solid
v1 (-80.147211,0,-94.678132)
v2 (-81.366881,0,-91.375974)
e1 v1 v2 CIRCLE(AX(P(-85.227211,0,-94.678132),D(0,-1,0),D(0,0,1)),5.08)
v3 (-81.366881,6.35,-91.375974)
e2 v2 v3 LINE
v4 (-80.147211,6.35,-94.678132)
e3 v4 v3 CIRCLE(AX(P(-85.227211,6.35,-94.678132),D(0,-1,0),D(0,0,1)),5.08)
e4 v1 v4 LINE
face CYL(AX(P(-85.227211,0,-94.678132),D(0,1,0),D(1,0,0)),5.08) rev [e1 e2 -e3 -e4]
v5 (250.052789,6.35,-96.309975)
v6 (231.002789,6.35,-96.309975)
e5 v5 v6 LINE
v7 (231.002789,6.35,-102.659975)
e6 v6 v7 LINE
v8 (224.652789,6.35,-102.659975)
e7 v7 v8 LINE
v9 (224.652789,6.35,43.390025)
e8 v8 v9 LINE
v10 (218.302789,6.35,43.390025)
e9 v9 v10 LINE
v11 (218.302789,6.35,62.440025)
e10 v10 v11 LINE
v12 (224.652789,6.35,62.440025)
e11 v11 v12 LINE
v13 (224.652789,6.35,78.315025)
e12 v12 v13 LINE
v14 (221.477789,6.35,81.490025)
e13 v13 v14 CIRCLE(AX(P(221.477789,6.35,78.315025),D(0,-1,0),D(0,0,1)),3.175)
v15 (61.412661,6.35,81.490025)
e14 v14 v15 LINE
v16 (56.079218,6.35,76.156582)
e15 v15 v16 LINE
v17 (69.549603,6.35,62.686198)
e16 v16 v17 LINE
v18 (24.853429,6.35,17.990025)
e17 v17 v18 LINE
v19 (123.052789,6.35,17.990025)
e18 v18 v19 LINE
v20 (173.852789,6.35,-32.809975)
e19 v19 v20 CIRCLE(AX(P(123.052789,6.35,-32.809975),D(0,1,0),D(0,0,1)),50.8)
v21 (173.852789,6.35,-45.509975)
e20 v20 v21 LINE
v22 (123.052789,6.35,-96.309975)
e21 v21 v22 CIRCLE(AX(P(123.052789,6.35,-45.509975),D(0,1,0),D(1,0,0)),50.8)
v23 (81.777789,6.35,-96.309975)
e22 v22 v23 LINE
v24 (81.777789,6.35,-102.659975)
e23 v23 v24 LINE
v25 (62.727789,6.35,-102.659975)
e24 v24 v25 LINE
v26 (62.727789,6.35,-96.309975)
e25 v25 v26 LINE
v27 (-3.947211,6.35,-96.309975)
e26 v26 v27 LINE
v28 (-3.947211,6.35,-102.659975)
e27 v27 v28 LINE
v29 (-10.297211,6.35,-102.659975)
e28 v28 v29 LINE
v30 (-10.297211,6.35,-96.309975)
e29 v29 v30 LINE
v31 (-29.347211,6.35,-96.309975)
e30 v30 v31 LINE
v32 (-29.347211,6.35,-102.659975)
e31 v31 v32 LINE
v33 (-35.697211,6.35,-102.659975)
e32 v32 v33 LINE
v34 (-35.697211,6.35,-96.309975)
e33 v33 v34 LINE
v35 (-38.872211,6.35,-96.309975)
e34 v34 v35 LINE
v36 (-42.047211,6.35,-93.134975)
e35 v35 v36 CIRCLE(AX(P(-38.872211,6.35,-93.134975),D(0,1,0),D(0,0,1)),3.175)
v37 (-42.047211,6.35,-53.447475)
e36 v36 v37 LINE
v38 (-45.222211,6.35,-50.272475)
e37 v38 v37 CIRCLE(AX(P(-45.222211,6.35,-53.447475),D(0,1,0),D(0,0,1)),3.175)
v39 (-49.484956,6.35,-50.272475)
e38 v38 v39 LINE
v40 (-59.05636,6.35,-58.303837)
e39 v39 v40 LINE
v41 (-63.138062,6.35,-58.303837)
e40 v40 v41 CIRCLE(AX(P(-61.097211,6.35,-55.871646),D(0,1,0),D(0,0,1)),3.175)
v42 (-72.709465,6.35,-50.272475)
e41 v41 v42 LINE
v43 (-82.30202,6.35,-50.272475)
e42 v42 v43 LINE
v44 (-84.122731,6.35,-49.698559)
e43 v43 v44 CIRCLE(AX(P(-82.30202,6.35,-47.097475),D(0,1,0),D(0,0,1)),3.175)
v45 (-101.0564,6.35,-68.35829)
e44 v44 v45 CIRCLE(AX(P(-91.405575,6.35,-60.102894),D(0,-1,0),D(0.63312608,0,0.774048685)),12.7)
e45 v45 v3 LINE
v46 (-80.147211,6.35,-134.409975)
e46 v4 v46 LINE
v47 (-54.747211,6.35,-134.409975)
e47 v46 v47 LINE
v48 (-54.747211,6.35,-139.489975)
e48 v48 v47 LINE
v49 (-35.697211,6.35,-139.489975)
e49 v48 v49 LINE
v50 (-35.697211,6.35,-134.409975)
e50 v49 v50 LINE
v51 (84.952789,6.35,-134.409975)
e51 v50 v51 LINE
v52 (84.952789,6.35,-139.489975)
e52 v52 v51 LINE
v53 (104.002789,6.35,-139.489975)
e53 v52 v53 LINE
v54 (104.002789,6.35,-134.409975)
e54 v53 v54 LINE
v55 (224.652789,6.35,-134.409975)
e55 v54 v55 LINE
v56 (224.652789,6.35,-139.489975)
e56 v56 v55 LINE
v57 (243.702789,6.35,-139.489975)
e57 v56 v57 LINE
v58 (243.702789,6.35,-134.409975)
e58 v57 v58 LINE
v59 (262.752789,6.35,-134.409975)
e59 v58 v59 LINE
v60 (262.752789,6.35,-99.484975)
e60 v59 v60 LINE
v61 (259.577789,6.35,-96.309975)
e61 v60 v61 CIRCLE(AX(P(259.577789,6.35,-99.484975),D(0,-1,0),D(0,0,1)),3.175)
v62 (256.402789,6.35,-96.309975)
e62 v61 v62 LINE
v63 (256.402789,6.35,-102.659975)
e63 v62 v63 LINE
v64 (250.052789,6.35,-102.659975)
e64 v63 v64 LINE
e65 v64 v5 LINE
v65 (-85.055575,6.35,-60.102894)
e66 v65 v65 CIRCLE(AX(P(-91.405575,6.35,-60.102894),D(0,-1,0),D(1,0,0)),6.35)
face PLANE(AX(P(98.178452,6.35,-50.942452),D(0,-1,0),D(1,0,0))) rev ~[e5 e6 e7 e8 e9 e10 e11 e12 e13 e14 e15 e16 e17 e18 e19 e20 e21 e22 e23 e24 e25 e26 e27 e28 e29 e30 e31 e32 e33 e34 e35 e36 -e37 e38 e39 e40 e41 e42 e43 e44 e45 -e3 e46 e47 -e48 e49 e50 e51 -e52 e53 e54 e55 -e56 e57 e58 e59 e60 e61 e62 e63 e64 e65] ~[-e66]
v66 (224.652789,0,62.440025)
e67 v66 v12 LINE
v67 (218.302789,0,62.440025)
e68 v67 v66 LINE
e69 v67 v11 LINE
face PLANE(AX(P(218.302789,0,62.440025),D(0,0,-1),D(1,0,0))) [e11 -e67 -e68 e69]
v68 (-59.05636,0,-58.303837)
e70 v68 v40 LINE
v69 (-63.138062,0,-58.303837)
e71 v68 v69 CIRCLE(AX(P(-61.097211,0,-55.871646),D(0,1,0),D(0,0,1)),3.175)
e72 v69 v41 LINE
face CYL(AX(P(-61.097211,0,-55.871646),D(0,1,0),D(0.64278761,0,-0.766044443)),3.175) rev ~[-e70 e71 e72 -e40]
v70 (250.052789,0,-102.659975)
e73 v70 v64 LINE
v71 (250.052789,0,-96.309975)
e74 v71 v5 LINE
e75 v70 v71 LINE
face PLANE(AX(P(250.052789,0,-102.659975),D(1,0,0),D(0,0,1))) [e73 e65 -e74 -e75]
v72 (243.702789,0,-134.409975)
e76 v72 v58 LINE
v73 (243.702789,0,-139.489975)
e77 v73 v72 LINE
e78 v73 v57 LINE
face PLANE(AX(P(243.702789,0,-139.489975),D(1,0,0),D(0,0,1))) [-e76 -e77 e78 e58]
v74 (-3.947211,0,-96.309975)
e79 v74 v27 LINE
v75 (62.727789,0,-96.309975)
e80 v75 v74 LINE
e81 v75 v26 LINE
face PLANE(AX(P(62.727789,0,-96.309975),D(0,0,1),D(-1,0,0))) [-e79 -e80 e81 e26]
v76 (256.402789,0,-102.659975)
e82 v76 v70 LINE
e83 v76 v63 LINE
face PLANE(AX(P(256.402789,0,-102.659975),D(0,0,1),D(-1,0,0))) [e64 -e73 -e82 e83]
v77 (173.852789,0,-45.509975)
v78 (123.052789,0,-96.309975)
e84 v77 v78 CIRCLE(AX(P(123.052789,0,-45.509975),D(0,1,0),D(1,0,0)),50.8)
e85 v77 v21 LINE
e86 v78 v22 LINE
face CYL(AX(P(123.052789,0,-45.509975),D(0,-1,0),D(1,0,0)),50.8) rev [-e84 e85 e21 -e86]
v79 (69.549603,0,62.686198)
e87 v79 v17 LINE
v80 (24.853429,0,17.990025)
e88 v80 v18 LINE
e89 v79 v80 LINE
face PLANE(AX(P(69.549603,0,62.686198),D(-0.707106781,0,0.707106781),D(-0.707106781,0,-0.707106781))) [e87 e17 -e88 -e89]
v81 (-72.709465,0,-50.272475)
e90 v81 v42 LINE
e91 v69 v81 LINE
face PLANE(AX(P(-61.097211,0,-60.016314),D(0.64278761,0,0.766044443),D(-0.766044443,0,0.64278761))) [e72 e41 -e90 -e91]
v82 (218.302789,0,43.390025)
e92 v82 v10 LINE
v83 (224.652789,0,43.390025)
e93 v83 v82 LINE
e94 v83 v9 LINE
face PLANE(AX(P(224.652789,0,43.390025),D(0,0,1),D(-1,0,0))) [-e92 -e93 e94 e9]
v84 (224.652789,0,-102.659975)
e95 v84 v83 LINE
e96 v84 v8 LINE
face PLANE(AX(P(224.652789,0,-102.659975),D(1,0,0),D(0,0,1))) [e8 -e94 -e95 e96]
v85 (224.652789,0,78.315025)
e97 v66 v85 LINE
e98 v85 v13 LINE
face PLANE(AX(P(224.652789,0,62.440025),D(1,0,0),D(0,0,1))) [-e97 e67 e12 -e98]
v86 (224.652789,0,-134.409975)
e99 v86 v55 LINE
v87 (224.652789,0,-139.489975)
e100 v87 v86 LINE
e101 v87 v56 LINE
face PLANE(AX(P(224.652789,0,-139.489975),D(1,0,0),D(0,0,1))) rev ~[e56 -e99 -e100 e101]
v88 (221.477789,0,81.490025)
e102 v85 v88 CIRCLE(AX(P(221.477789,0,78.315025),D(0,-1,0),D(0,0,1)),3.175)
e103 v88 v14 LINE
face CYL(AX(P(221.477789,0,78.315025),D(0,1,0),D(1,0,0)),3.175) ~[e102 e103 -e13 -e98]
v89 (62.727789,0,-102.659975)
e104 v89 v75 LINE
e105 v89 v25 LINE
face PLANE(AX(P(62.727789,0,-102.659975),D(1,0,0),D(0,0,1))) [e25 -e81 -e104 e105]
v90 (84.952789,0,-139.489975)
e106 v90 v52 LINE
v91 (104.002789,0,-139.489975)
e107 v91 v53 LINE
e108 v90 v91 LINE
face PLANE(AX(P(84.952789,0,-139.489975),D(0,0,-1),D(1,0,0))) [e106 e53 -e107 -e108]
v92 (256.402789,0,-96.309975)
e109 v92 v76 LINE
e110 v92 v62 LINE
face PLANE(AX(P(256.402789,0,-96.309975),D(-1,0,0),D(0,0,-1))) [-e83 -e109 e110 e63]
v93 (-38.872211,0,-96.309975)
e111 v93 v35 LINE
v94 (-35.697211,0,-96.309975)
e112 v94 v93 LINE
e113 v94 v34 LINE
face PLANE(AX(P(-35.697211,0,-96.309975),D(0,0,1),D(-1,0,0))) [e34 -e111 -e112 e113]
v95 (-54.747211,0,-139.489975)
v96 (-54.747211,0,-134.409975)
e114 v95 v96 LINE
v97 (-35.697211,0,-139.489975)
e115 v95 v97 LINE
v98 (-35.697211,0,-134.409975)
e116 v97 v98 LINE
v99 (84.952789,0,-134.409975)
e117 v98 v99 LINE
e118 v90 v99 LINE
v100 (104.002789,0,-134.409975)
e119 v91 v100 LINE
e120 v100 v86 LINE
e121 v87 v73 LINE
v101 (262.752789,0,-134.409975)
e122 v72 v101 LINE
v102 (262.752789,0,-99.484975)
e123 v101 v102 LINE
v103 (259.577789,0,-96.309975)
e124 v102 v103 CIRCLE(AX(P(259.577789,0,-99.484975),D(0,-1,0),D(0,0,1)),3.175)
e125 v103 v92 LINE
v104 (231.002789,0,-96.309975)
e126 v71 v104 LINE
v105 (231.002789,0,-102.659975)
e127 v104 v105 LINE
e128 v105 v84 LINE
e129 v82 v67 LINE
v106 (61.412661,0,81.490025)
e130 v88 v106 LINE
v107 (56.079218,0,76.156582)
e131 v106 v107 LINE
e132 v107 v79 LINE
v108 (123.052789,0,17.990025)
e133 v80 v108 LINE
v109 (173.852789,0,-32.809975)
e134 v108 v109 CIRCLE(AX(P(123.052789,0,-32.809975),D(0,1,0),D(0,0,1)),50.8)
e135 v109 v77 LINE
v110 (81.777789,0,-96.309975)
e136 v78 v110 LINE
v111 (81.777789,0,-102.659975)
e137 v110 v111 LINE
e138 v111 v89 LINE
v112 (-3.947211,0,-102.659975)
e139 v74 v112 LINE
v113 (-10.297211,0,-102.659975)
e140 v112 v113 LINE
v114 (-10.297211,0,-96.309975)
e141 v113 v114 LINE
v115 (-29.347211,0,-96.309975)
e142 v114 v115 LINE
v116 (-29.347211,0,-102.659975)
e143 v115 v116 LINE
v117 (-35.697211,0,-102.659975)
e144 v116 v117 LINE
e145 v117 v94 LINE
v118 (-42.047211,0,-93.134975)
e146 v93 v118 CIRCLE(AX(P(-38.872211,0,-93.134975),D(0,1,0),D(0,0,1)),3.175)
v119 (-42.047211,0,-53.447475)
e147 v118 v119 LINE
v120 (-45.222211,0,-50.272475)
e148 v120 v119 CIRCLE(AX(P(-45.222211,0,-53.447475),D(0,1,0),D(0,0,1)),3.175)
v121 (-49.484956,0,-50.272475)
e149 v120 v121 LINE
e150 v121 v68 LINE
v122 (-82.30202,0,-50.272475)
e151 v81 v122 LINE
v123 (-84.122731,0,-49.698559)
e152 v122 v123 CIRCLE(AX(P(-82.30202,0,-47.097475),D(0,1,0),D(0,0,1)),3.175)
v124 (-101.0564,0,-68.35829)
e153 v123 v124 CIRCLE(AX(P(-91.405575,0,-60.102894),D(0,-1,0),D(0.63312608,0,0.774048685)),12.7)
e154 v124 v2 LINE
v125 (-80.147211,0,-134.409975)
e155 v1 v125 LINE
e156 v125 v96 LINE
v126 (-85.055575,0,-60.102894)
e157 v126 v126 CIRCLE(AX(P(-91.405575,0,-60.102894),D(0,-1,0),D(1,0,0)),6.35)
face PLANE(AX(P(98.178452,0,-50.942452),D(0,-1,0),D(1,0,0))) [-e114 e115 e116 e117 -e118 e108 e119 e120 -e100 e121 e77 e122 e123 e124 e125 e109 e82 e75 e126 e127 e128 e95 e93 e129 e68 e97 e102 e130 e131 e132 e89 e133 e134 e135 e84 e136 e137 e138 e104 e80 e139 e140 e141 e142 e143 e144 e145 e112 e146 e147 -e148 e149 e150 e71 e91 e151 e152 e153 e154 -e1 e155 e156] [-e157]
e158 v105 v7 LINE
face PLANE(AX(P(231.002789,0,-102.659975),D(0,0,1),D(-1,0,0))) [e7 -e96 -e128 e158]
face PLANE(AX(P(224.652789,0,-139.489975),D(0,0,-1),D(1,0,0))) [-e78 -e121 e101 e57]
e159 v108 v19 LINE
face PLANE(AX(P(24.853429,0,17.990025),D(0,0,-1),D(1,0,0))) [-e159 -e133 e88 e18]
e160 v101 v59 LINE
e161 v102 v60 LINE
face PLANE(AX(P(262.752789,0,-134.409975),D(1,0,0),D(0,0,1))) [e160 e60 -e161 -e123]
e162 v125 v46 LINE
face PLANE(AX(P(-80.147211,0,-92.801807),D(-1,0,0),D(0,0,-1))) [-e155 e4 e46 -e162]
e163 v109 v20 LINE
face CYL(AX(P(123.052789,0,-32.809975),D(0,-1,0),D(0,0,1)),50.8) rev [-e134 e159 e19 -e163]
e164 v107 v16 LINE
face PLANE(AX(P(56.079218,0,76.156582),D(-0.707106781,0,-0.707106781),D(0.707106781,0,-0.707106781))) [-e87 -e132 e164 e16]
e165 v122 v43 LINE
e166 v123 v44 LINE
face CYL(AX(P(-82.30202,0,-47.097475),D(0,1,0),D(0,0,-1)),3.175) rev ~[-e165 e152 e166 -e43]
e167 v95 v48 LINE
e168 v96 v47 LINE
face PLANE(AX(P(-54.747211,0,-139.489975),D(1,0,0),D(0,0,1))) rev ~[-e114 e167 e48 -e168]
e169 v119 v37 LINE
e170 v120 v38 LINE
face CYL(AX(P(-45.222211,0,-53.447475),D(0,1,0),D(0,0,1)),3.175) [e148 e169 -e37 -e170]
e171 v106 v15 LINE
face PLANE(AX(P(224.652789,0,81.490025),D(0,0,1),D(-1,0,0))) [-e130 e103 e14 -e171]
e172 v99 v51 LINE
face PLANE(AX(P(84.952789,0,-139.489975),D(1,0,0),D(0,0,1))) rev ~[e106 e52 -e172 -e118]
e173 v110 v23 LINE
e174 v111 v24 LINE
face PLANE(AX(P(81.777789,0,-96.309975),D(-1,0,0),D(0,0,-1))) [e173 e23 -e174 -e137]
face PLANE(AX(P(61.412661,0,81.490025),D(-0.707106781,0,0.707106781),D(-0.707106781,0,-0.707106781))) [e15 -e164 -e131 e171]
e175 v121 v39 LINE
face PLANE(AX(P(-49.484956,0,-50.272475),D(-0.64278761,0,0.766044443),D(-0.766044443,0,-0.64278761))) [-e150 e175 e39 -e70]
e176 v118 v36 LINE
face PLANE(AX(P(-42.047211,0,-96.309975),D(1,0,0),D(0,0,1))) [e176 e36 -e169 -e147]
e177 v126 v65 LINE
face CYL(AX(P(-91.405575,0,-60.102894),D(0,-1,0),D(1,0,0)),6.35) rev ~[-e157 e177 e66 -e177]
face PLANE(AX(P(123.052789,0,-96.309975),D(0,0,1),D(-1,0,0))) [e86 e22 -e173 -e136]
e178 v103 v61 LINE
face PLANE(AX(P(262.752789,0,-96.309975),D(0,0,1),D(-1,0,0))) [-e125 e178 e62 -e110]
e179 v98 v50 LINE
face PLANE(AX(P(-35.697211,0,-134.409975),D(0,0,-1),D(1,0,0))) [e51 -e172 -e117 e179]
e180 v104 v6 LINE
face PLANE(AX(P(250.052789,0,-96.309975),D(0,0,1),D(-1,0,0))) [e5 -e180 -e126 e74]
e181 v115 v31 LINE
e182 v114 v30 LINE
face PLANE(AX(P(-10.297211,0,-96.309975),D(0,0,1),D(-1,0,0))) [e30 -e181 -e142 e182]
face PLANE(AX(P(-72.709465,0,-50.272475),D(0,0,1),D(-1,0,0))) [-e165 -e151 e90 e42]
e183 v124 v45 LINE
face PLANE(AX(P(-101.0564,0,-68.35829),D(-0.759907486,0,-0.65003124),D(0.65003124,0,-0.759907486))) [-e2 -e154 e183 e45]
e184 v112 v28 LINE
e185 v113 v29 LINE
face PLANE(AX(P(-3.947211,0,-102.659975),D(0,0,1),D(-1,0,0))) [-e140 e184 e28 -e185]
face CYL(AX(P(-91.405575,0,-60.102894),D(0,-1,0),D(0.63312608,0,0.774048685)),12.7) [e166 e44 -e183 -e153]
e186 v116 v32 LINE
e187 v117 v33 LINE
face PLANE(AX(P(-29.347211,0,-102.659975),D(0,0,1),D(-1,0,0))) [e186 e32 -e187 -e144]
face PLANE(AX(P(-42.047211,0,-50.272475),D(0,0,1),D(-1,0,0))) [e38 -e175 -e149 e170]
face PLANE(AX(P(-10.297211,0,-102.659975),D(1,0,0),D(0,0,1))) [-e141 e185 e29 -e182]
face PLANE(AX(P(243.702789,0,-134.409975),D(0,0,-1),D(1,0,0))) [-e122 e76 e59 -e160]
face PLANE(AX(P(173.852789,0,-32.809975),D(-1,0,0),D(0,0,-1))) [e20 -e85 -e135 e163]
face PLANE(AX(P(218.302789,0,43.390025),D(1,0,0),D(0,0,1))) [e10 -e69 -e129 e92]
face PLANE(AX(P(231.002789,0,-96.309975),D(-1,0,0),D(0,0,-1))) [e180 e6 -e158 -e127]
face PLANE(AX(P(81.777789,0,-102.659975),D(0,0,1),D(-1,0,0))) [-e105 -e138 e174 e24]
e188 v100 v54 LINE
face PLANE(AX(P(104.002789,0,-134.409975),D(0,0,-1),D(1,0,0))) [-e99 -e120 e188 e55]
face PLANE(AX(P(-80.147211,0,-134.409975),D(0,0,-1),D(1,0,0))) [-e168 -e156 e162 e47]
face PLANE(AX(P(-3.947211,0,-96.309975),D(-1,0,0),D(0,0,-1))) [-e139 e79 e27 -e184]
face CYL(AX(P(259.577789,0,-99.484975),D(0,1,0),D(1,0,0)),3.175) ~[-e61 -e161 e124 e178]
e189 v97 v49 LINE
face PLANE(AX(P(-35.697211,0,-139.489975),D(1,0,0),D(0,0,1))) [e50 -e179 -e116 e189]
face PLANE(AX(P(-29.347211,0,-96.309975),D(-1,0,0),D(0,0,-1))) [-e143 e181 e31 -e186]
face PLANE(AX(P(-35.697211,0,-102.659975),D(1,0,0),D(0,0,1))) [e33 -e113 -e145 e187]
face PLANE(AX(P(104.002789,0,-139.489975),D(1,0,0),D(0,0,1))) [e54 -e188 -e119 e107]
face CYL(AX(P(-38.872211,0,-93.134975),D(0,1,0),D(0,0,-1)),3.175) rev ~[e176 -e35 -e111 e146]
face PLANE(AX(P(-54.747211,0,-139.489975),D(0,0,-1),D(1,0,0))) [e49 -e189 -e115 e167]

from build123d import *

# Parameters (mm, degrees)
F0_R     = 6.35
F0_W     = 19.05
F0_H     = 5.08
F1_DEPTH = 6.35
F2_R     = 3.175
F3_R     = 5.08
F4_R     = 3.175
F5_R     = 3.175


# Not quite as in the source:
# - ends of sketch curves that miss each other by under 0.0002 mm in the source are joined


with BuildPart() as f1:
    # F0 (on Front) → F1 (new body)
    with BuildSketch(Plane.XZ):
        with BuildLine():
            Line((-72.7094654823, -50.272475262), (-83.3648741359, -50.272475262))
            ThreePointArc((-83.3648741359, -50.272475262), (-100.4842470659, -51.222143603), (-101.056400417, -68.3582903151))
            Line((-101.056400417, -68.3582903151), (-80.147210941, -92.8018072064))
            Line((-80.147210941, -92.8018072064), (-80.147210941, -134.409975262))
            Line((-80.147210941, -134.409975262), (-54.747210941, -134.409975262))
            Line((-54.747210941, -134.409975262), (-35.697210941, -134.409975262))
            Line((-35.697210941, -134.409975262), (84.952789059, -134.409975262))
            Line((84.952789059, -134.409975262), (104.002789059, -134.409975262))
            Line((104.002789059, -134.409975262), (224.652789059, -134.409975262))
            Line((224.652789059, -134.409975262), (243.702789059, -134.409975262))
            Line((243.702789059, -134.409975262), (262.752789059, -134.409975262))
            Line((262.752789059, -134.409975262), (262.752789059, -96.309975262))
            Line((262.752789059, -96.309975262), (256.402789059, -96.309975262))
            Line((256.402789059, -96.309975262), (256.402789059, -102.659975262))
            Line((256.402789059, -102.659975262), (250.052789059, -102.659975262))
            Line((250.052789059, -102.659975262), (250.052789059, -96.309975262))
            Line((250.052789059, -96.309975262), (231.002789059, -96.309975262))
            Line((231.002789059, -96.309975262), (231.002789059, -102.659975262))
            Line((231.002789059, -102.659975262), (224.652789059, -102.659975262))
            Line((224.652789059, -102.659975262), (224.652789059, 43.390024738))
            Line((224.652789059, 43.390024738), (218.302789059, 43.390024738))
            Line((218.302789059, 43.390024738), (218.302789059, 62.440024738))
            Line((218.302789059, 62.440024738), (224.652789059, 62.440024738))
            Line((224.652789059, 62.440024738), (224.652789059, 81.490024738))
            Line((224.652789059, 81.490024738), (61.4126609984, 81.490024738))
            Line((61.4126609984, 81.490024738), (56.0792184251, 76.1565821646))
            Line((56.0792184251, 76.1565821646), (69.5496026067, 62.686197983))
            Line((69.5496026067, 62.686197983), (24.8534293616, 17.990024738))
            Line((24.8534293616, 17.990024738), (123.052789059, 17.990024738))
            ThreePointArc((123.052789059, 17.990024738), (158.9738135432, 3.1110492223), (173.852789059, -32.809975262))
            Line((173.852789059, -32.809975262), (173.852789059, -45.509975262))
            ThreePointArc((173.852789059, -45.509975262), (158.9738135432, -81.4309997463), (123.052789059, -96.309975262))
            Line((123.052789059, -96.309975262), (81.777789059, -96.309975262))
            Line((81.777789059, -96.309975262), (81.777789059, -102.659975262))
            Line((81.777789059, -102.659975262), (62.727789059, -102.659975262))
            Line((62.727789059, -102.659975262), (62.727789059, -96.309975262))
            Line((62.727789059, -96.309975262), (-3.947210941, -96.309975262))
            Line((-3.947210941, -96.309975262), (-3.947210941, -102.659975262))
            Line((-3.947210941, -102.659975262), (-10.297210941, -102.659975262))
            Line((-10.297210941, -102.659975262), (-10.297210941, -96.309975262))
            Line((-10.297210941, -96.309975262), (-29.347210941, -96.309975262))
            Line((-29.347210941, -96.309975262), (-29.347210941, -102.659975262))
            Line((-29.347210941, -102.659975262), (-35.697210941, -102.659975262))
            Line((-35.697210941, -102.659975262), (-35.697210941, -96.309975262))
            Line((-35.697210941, -96.309975262), (-42.047210941, -96.309975262))
            Line((-42.047210941, -96.309975262), (-42.047210941, -50.272475262))
            Line((-42.047210941, -50.272475262), (-49.4849563998, -50.272475262))
            Line((-49.4849563998, -50.272475262), (-61.097210941, -60.0163137647))
            Line((-61.097210941, -60.0163137647), (-72.7094654823, -50.272475262))
        make_face()
        with Locations((-91.4055753496, -60.1028935639)):
            Circle(F0_R, mode=Mode.SUBTRACT)
        with Locations((-45.222210941, -136.949975262)):
            Rectangle(F0_W, F0_H)
        with Locations((94.477789059, -136.949975262)):
            Rectangle(F0_W, F0_H)
        with Locations((234.177789059, -136.949975262)):
            Rectangle(F0_W, F0_H)
    extrude(amount=-F1_DEPTH)

    # F2
    f2_edges = [f1.edges().sort_by_distance(p)[0] for p in [
        (224.652789, 3.175, 81.490025),
        (-42.047211, 3.175, -96.309975),
    ]]
    fillet(f2_edges, radius=F2_R)

    # F3
    f3_edges = [f1.edges().sort_by_distance(p)[0] for p in [
        (-80.147211, 3.175, -92.801807),
    ]]
    fillet(f3_edges, radius=F3_R)

    # F4
    f4_edges = [f1.edges().sort_by_distance(p)[0] for p in [
        (-42.047211, 3.175, -50.272475),
    ]]
    fillet(f4_edges, radius=F4_R)

    # F5
    f5_edges = [f1.edges().sort_by_distance(p)[0] for p in [
        (-61.097211, 3.175, -60.016314),
        (-83.364874, 3.175, -50.272475),
        (262.752789, 3.175, -96.309975),
    ]]
    fillet(f5_edges, radius=F5_R)


solid = f1.part
